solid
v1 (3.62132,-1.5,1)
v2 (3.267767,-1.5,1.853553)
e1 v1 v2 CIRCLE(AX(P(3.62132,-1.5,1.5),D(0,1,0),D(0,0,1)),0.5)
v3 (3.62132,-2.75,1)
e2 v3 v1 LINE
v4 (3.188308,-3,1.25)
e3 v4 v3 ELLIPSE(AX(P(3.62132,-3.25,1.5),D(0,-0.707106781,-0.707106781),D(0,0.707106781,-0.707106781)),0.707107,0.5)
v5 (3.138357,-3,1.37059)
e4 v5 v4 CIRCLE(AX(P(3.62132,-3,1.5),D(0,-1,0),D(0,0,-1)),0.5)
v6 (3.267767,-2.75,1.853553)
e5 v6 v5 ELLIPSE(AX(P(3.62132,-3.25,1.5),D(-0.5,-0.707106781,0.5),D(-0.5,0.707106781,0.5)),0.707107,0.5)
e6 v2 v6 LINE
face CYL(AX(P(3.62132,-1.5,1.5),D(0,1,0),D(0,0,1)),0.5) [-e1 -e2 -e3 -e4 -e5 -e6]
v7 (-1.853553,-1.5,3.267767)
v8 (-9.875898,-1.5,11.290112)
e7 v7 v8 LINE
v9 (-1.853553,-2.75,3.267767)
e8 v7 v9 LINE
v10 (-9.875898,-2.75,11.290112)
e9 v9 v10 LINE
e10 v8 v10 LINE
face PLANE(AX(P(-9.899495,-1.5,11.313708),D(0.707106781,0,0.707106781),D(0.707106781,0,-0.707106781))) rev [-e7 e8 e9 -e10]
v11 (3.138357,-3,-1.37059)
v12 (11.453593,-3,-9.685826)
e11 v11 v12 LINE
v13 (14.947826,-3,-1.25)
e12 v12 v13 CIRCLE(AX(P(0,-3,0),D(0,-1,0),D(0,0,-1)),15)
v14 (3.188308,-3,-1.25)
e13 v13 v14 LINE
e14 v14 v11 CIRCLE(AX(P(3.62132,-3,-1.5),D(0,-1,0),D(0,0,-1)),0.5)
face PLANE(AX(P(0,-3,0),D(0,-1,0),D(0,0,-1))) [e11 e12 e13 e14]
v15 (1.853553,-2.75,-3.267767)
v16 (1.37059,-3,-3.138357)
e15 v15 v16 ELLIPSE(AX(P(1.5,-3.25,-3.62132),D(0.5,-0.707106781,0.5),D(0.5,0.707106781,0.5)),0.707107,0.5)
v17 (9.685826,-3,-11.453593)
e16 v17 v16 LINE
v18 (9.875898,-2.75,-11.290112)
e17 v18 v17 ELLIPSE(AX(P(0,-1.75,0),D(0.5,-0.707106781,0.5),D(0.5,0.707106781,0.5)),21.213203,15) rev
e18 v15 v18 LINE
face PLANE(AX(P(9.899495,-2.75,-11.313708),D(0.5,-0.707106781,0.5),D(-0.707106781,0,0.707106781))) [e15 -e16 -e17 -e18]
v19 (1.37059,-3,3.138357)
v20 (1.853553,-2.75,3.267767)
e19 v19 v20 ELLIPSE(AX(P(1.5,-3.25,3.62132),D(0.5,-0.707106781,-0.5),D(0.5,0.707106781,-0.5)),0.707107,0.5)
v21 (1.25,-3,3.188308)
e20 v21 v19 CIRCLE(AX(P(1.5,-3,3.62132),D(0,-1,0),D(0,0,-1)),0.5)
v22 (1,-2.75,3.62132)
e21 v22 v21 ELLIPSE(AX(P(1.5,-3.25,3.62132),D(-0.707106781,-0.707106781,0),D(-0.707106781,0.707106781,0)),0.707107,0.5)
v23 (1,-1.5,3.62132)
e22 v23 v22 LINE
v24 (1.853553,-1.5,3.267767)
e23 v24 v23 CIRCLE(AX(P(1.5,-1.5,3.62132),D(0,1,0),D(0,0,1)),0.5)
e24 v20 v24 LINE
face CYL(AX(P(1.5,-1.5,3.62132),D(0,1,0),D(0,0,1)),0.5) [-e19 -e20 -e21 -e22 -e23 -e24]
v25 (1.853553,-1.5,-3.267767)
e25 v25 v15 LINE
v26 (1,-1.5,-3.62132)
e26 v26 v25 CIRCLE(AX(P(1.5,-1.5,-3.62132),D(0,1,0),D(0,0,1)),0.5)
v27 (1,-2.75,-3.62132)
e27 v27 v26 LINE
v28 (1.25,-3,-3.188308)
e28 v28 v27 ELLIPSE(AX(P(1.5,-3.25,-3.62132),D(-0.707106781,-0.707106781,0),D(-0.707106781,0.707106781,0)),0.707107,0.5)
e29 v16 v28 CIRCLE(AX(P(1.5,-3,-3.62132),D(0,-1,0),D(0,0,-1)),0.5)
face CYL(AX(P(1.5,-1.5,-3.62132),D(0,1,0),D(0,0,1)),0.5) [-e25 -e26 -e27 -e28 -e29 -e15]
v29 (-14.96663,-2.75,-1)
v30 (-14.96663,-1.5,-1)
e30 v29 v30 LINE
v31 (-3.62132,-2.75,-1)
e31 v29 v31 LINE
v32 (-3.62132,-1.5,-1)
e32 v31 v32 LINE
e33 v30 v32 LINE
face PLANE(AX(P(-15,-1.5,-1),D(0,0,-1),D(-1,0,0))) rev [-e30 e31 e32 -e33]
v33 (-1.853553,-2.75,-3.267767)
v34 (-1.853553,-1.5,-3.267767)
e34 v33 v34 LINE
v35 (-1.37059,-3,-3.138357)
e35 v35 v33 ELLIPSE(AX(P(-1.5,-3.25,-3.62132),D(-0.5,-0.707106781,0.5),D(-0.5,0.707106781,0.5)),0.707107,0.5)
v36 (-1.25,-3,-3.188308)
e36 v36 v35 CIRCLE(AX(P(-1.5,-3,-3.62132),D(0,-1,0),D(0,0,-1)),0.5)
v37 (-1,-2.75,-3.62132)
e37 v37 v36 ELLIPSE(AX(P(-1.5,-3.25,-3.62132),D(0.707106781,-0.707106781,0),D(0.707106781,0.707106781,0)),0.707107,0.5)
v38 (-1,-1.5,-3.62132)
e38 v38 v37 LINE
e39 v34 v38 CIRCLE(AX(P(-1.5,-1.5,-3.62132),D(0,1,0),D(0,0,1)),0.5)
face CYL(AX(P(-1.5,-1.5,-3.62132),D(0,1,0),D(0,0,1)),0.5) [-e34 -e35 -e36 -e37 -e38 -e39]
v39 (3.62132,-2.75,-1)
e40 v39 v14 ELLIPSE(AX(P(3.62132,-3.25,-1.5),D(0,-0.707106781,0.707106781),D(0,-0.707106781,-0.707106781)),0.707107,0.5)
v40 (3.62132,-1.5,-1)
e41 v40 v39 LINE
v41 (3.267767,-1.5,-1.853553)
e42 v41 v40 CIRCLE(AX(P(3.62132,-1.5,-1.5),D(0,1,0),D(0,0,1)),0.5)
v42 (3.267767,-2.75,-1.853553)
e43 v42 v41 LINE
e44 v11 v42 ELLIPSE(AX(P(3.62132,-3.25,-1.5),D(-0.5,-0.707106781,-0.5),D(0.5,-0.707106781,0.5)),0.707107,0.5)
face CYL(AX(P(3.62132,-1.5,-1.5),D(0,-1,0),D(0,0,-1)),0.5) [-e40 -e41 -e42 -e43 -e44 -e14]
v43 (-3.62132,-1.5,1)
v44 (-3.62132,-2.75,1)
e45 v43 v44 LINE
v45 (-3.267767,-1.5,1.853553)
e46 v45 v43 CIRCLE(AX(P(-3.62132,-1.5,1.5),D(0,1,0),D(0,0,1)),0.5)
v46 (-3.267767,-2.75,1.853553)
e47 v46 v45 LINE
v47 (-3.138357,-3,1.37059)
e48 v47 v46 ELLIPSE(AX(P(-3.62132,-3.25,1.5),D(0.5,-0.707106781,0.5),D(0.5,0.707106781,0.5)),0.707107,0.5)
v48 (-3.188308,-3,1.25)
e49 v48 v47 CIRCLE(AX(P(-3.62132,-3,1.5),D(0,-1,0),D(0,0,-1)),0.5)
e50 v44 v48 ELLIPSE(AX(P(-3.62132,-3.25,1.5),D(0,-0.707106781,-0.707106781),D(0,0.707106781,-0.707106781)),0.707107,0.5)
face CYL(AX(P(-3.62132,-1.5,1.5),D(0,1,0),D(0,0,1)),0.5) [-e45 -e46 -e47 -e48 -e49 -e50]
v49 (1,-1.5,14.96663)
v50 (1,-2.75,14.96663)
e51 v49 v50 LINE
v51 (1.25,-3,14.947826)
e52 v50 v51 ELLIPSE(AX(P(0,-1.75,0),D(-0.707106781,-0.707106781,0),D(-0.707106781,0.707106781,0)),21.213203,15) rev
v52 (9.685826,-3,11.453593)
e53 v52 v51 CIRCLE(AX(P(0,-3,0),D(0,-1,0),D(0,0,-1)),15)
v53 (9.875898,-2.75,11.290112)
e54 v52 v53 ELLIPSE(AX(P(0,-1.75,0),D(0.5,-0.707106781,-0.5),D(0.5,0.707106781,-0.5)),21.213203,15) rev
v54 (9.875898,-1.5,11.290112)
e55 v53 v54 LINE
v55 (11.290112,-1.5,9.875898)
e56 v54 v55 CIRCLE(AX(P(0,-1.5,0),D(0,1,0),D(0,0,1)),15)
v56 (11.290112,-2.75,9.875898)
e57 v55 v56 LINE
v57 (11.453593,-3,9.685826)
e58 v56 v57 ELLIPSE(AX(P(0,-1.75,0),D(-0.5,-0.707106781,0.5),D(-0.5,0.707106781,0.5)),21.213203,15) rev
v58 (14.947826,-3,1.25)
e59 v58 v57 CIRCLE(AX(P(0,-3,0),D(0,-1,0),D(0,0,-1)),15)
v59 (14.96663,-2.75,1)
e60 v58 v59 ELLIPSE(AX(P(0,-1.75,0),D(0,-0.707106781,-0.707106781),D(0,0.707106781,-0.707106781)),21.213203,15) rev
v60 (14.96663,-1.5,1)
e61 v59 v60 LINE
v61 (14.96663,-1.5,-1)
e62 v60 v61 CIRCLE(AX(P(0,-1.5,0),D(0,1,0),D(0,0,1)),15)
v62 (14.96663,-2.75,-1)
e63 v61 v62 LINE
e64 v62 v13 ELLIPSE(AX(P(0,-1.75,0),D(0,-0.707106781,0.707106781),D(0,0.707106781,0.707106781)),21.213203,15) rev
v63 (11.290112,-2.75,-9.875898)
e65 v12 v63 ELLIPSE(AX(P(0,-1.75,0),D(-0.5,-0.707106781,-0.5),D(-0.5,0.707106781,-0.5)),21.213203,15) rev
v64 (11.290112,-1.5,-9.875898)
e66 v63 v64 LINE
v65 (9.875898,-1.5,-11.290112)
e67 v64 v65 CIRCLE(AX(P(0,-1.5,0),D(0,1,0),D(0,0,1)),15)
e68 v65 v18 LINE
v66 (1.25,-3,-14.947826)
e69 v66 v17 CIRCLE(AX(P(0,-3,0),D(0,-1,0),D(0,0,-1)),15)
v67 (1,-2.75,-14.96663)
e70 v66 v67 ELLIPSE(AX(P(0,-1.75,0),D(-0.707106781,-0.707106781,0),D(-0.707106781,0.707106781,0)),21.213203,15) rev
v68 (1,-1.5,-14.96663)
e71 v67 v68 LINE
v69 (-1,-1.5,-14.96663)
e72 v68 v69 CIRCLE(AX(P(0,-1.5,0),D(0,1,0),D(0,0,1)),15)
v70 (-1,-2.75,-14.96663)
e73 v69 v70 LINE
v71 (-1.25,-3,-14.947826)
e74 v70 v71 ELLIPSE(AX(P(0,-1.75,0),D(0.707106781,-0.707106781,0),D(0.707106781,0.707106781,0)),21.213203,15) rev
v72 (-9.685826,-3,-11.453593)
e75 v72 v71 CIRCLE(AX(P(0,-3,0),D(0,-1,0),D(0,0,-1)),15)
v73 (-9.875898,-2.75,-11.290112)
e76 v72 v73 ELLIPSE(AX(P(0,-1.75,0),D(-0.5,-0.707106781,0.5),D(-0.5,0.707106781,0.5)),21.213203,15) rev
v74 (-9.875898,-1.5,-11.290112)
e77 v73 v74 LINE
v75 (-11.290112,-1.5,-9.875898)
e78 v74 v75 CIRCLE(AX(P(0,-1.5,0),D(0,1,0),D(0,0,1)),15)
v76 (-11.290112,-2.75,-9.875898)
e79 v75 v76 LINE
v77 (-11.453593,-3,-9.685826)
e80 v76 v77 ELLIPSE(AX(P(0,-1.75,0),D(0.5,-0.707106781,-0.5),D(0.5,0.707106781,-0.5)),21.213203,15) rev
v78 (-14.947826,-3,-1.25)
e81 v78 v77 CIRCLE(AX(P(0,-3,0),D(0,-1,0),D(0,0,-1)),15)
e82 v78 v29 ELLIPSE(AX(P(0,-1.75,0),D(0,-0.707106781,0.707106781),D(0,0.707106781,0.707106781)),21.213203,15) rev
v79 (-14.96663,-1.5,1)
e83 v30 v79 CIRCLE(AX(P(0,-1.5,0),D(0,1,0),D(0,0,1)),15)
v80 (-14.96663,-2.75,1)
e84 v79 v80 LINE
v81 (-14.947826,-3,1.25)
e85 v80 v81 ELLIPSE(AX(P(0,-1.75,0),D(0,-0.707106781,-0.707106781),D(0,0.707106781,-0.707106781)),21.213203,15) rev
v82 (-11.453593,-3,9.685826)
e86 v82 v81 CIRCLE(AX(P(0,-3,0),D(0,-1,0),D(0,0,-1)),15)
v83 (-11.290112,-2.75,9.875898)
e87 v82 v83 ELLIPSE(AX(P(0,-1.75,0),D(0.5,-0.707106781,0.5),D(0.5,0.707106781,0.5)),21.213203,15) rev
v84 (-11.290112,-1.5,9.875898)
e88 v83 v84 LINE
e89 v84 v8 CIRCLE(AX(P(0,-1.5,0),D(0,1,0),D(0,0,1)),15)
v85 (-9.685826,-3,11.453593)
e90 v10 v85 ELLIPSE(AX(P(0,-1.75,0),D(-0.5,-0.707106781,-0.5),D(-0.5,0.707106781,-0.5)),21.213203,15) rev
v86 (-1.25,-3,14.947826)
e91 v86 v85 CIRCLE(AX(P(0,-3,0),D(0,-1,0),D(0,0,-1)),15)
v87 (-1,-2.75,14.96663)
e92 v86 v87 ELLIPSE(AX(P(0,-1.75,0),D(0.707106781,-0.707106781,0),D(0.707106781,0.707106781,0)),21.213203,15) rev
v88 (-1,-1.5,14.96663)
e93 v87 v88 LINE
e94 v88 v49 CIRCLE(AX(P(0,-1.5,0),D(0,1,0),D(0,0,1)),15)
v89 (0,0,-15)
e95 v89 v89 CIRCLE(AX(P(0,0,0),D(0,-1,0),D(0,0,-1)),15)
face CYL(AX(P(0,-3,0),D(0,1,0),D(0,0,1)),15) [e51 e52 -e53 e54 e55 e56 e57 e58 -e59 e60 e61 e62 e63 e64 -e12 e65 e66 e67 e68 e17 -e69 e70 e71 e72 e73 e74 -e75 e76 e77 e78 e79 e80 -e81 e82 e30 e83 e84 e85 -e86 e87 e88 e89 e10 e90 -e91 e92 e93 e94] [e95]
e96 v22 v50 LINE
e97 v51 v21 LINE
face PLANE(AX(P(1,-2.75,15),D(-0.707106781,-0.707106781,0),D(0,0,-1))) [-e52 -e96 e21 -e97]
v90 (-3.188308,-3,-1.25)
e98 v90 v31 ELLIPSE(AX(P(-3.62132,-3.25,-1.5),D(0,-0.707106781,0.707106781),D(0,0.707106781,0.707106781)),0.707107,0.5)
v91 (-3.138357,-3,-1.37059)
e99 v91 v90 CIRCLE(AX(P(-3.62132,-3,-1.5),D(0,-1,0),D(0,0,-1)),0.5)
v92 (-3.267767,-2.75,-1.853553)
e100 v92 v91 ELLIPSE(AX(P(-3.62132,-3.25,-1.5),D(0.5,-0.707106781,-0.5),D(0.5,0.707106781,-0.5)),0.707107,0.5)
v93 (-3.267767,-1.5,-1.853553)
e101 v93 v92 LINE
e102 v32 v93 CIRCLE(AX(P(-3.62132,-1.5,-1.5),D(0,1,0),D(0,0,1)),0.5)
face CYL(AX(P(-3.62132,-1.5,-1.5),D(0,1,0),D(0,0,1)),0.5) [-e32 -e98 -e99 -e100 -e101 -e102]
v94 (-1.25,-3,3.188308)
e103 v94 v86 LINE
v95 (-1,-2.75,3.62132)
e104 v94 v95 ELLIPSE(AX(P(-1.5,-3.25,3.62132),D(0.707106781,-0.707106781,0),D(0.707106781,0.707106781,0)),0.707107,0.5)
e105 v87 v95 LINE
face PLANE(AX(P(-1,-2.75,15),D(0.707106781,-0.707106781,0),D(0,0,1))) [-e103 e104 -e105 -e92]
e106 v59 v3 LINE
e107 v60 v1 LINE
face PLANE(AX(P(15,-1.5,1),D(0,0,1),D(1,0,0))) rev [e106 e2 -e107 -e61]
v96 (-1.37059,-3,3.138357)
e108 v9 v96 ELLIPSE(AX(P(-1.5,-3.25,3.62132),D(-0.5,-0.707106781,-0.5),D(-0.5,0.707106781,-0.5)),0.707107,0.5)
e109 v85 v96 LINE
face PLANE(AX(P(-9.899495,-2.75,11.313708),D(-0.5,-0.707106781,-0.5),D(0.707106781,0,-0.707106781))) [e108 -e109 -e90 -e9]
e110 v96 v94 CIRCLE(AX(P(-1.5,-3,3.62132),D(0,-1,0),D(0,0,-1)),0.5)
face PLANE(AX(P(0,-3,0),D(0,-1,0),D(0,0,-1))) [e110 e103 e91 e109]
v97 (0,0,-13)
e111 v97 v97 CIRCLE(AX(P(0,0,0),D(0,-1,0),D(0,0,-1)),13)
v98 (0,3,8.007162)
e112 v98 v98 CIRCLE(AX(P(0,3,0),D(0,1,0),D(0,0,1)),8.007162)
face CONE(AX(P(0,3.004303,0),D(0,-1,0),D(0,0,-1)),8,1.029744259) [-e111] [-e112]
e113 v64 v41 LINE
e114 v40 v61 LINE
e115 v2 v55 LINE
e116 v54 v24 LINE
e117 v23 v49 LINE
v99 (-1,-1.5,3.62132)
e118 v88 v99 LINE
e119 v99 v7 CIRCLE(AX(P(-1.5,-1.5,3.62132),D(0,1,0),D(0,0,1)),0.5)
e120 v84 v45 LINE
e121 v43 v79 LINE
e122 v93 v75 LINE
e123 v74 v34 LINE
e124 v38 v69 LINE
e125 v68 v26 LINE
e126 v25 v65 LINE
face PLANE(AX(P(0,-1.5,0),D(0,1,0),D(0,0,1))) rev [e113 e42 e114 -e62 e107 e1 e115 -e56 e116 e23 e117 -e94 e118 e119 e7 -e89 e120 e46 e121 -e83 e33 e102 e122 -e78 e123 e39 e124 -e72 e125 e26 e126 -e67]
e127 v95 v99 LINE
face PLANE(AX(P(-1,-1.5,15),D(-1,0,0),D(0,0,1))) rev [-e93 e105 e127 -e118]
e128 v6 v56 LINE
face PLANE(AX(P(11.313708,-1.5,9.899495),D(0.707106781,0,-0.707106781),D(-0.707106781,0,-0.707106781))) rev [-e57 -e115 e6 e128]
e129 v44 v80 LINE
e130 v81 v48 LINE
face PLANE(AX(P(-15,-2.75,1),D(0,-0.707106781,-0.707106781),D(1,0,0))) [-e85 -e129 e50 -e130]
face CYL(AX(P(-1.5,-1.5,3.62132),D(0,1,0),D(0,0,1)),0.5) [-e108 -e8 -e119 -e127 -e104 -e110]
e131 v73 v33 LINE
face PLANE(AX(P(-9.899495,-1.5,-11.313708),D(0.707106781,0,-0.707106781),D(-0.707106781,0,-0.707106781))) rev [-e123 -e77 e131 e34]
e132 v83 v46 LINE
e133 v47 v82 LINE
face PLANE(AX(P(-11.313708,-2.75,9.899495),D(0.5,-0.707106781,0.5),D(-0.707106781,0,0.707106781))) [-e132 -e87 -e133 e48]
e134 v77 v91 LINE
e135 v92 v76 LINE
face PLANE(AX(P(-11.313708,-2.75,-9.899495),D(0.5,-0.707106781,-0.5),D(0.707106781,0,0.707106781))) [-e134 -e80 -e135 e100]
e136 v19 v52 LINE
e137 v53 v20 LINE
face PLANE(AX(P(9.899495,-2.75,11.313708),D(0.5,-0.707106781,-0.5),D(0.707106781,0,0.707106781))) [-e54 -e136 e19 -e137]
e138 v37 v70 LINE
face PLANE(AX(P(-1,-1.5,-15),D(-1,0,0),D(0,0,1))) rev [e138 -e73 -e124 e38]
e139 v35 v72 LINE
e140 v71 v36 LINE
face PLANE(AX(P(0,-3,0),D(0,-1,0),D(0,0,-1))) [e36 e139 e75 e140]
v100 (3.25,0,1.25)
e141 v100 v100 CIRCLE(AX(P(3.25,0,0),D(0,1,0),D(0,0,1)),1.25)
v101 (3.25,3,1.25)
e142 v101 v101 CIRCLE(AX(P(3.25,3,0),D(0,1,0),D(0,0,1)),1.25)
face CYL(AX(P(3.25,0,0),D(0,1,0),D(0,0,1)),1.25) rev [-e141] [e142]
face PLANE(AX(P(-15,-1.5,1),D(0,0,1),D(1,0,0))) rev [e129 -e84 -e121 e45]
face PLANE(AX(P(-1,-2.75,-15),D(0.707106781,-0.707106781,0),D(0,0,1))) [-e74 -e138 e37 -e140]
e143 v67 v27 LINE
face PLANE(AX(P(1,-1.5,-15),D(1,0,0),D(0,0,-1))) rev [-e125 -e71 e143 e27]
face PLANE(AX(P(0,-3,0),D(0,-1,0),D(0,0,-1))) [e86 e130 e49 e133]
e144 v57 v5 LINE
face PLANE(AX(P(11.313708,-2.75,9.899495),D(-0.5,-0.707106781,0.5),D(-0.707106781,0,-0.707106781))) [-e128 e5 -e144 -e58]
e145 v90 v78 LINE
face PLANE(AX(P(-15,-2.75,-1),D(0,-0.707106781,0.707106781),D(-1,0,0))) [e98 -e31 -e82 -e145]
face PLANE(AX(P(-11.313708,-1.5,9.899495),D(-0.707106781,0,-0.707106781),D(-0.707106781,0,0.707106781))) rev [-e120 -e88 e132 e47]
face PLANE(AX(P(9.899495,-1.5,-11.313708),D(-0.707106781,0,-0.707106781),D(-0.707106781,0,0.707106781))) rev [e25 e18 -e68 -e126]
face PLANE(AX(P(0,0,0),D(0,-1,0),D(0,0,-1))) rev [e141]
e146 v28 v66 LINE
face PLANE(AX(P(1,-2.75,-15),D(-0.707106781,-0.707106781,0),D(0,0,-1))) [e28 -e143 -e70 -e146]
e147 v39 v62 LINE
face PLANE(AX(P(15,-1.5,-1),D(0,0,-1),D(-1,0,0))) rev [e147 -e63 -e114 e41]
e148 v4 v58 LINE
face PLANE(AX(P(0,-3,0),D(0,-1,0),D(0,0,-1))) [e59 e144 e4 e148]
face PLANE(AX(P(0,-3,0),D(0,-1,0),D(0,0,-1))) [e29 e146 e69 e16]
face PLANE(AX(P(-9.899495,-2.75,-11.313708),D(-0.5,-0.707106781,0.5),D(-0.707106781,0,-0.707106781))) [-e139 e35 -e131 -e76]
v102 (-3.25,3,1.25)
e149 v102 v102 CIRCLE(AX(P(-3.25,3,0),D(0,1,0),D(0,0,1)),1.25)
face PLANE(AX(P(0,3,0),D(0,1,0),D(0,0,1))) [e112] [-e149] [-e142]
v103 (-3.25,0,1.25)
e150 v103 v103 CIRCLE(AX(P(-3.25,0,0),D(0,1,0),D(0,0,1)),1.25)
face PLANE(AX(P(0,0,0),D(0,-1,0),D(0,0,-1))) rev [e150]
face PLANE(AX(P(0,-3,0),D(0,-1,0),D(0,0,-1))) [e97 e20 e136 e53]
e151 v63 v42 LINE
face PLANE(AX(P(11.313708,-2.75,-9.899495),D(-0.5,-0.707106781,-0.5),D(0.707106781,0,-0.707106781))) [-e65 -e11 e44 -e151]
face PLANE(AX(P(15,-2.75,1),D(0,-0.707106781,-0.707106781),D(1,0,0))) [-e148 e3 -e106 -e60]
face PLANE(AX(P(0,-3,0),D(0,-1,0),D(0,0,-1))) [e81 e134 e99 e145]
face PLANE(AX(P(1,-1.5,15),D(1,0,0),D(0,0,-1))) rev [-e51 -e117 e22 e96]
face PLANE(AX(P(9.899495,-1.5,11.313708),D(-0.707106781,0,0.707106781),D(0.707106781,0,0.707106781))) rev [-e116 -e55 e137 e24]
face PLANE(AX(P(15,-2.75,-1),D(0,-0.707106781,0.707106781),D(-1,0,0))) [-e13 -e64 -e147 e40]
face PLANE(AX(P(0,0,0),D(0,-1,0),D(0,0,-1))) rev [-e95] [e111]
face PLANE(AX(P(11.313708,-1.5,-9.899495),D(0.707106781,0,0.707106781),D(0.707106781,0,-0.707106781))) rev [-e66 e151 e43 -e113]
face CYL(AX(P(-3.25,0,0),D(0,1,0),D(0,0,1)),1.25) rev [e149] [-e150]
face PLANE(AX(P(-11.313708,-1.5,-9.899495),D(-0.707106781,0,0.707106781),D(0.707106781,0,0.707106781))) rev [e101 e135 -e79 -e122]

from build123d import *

# Parameters (mm, degrees)
SKETCH1_R                    = 8
BOSS_EXTRUDE1_DEPTH          = 3
SKETCH2_R                    = 1.25
CUT_EXTRUDE1_DEPTH           = 12.704699911
SKETCH3_R                    = 15
BOSS_EXTRUDE2_DEPTH          = 3
CHAMFER1_SIZE                = 5
CHAMFER1_SIZE_2              = 3.004303095
SKETCH4_W                    = 15
SKETCH4_H                    = 2
CUT_EXTRUDE2_DEPTH           = 1.5
CHAMFER2_SIZE                = 0.25
CIRPATTERN1_COUNT            = 8
CHAMFER2_OF_CIRPATTERN1_SIZE = 0.25
FILLET1_R                    = 0.5


with BuildPart() as part:
    # Sketch1 → Boss-Extrude1 (new body)
    with BuildSketch(Plane(origin=(0, 0, 0), x_dir=(1, 0, 0), z_dir=(0, 1, 0))):
        with Locations(Location((0, 0, 0), (0, 0, 270))):
            Circle(SKETCH1_R)
    extrude(amount=BOSS_EXTRUDE1_DEPTH)

    # Sketch2 → Cut-Extrude1 (cut, through all)
    with BuildSketch(Plane(origin=(0, 3, 0), x_dir=(1, 0, 0), z_dir=(0, 1, 0))):
        with Locations(Location((-3.25, 0, 0), (0, 0, 270))):
            Circle(SKETCH2_R)
        with Locations(Location((3.25, 0, 0), (0, 0, 270))):
            Circle(SKETCH2_R)
    extrude(amount=-CUT_EXTRUDE1_DEPTH, mode=Mode.SUBTRACT)

    # Sketch3 → Boss-Extrude2 (add)
    with BuildSketch(Plane.XZ):
        with Locations(Location((0, 0, 0), (0, 0, 270))):
            Circle(SKETCH3_R)
    extrude(amount=BOSS_EXTRUDE2_DEPTH)

    # Chamfer1
    # the kernel refuses this chamfer: 5, 3.004303095 mm, written as the material it adds along each edge
    with BuildSketch(Plane(origin=(0, 0, 0), x_dir=(0, 0, 1), z_dir=(-1, 0, 0))) as chamfer1_piece_1_section:
        Polygon((8 + CHAMFER1_SIZE, 0), (8, CHAMFER1_SIZE_2), (8, 0), align=None)
    chamfer1_piece_1 = revolve(axis=Axis((0, 0, 0), (0, 1, 0)), mode=Mode.PRIVATE)
    chamfer1_piece_1 = split(chamfer1_piece_1, bisect_by=Plane(origin=(0, 3, -10.54798904), z_dir=(0, -1, 0)), keep=Keep.TOP, mode=Mode.PRIVATE)
    add(chamfer1_piece_1)

    # Sketch4 → Cut-Extrude2 (cut)
    with BuildSketch(Plane.XZ.offset(3)):
        with Locations((7.5, 0)):
            Rectangle(SKETCH4_W, SKETCH4_H)
    cut_extrude2 = extrude(amount=-CUT_EXTRUDE2_DEPTH, mode=Mode.SUBTRACT)

    # Chamfer2
    chamfer2_edges = [part.edges().sort_by_distance(p)[0] for p in [
        (7.483314774, -3, 1),
        (7.483314774, -3, -1),
    ]]
    chamfer(chamfer2_edges, length=CHAMFER2_SIZE)

    # CirPattern1: Cut-Extrude2 ×8 about axis
    cirpattern1_axis = Axis((0, 0, 0), (0, 1, 0))
    for i in range(1, CIRPATTERN1_COUNT):
        add(cut_extrude2.rotate(cirpattern1_axis, i * 360 / CIRPATTERN1_COUNT), mode=Mode.SUBTRACT)

    # Chamfer2 of CirPattern1
    chamfer2_of_cirpattern1_edges = [part.edges().sort_by_distance(p)[0] for p in [
        (5.998609403, -3, -4.584395841),
        (4.584395841, -3, -5.998609403),
        (1, -3, -7.483314774),
        (-1, -3, -7.483314774),
        (-4.584395841, -3, -5.998609403),
        (-5.998609403, -3, -4.584395841),
        (-7.483314774, -3, -1),
        (-7.483314774, -3, 1),
        (-5.998609403, -3, 4.584395841),
        (-4.584395841, -3, 5.998609403),
        (-1, -3, 7.483314774),
        (1, -3, 7.483314774),
        (4.584395841, -3, 5.998609403),
        (5.998609403, -3, 4.584395841),
    ]]
    chamfer(chamfer2_of_cirpattern1_edges, length=CHAMFER2_OF_CIRPATTERN1_SIZE)

    # Fillet1
    # the kernel refuses this fillet: 0.5 mm, written as the material it takes off along each edge
    with BuildSketch(Plane(origin=(1, -1.5, -2.414213562), x_dir=(0, 0, -1), z_dir=(0, -1, 0)), Plane(origin=(-1, -1.5, 2.414213562), x_dir=(0, 0, 1), z_dir=(0, -1, 0)), Plane(origin=(1, -1.5, 2.414213562), x_dir=(0.7071067811865474, 0, 0.7071067811865477), z_dir=(0, -1, 0)), Plane(origin=(2.414213562, -1.5, -1), x_dir=(0.7071067811865472, 0, -0.7071067811865478), z_dir=(0, -1, 0))) as fillet1_piece_1:
        with BuildLine():
            CenterArc((FILLET1_R * 2.41421356237, FILLET1_R), FILLET1_R, 135, 135)
            Line((FILLET1_R * 1.70710678119, FILLET1_R * 1.70710678119), (0, 0))
            Line((0, 0), (FILLET1_R * 2.41421356237, 0))
        make_face()
    extrude(amount=4.267766953, mode=Mode.SUBTRACT)
    with BuildSketch(Plane(origin=(-1, -1.5, -2.414213562), x_dir=(0, 0, -1), z_dir=(0, -1, 0)), Plane(origin=(-2.414213562, -1.5, -1), x_dir=(-0.7071067811865478, 0, -0.7071067811865474), z_dir=(0, -1, 0)), Plane(origin=(-2.414213562, -1.5, 1), x_dir=(-1, 0, 0), z_dir=(0, -1, 0)), Plane(origin=(2.414213562, -5.767766953, 1), x_dir=(1, 0, 0), z_dir=(0, 1, 0))) as fillet1_piece_2:
        with BuildLine():
            CenterArc((FILLET1_R * 2.41421356237, -FILLET1_R), FILLET1_R, 90, 135)
            Line((FILLET1_R * 1.70710678119, -FILLET1_R * 1.70710678119), (0, 0))
            Line((0, 0), (FILLET1_R * 2.41421356237, 0))
        make_face()
    extrude(amount=4.267766953, mode=Mode.SUBTRACT)


solid = part.part
